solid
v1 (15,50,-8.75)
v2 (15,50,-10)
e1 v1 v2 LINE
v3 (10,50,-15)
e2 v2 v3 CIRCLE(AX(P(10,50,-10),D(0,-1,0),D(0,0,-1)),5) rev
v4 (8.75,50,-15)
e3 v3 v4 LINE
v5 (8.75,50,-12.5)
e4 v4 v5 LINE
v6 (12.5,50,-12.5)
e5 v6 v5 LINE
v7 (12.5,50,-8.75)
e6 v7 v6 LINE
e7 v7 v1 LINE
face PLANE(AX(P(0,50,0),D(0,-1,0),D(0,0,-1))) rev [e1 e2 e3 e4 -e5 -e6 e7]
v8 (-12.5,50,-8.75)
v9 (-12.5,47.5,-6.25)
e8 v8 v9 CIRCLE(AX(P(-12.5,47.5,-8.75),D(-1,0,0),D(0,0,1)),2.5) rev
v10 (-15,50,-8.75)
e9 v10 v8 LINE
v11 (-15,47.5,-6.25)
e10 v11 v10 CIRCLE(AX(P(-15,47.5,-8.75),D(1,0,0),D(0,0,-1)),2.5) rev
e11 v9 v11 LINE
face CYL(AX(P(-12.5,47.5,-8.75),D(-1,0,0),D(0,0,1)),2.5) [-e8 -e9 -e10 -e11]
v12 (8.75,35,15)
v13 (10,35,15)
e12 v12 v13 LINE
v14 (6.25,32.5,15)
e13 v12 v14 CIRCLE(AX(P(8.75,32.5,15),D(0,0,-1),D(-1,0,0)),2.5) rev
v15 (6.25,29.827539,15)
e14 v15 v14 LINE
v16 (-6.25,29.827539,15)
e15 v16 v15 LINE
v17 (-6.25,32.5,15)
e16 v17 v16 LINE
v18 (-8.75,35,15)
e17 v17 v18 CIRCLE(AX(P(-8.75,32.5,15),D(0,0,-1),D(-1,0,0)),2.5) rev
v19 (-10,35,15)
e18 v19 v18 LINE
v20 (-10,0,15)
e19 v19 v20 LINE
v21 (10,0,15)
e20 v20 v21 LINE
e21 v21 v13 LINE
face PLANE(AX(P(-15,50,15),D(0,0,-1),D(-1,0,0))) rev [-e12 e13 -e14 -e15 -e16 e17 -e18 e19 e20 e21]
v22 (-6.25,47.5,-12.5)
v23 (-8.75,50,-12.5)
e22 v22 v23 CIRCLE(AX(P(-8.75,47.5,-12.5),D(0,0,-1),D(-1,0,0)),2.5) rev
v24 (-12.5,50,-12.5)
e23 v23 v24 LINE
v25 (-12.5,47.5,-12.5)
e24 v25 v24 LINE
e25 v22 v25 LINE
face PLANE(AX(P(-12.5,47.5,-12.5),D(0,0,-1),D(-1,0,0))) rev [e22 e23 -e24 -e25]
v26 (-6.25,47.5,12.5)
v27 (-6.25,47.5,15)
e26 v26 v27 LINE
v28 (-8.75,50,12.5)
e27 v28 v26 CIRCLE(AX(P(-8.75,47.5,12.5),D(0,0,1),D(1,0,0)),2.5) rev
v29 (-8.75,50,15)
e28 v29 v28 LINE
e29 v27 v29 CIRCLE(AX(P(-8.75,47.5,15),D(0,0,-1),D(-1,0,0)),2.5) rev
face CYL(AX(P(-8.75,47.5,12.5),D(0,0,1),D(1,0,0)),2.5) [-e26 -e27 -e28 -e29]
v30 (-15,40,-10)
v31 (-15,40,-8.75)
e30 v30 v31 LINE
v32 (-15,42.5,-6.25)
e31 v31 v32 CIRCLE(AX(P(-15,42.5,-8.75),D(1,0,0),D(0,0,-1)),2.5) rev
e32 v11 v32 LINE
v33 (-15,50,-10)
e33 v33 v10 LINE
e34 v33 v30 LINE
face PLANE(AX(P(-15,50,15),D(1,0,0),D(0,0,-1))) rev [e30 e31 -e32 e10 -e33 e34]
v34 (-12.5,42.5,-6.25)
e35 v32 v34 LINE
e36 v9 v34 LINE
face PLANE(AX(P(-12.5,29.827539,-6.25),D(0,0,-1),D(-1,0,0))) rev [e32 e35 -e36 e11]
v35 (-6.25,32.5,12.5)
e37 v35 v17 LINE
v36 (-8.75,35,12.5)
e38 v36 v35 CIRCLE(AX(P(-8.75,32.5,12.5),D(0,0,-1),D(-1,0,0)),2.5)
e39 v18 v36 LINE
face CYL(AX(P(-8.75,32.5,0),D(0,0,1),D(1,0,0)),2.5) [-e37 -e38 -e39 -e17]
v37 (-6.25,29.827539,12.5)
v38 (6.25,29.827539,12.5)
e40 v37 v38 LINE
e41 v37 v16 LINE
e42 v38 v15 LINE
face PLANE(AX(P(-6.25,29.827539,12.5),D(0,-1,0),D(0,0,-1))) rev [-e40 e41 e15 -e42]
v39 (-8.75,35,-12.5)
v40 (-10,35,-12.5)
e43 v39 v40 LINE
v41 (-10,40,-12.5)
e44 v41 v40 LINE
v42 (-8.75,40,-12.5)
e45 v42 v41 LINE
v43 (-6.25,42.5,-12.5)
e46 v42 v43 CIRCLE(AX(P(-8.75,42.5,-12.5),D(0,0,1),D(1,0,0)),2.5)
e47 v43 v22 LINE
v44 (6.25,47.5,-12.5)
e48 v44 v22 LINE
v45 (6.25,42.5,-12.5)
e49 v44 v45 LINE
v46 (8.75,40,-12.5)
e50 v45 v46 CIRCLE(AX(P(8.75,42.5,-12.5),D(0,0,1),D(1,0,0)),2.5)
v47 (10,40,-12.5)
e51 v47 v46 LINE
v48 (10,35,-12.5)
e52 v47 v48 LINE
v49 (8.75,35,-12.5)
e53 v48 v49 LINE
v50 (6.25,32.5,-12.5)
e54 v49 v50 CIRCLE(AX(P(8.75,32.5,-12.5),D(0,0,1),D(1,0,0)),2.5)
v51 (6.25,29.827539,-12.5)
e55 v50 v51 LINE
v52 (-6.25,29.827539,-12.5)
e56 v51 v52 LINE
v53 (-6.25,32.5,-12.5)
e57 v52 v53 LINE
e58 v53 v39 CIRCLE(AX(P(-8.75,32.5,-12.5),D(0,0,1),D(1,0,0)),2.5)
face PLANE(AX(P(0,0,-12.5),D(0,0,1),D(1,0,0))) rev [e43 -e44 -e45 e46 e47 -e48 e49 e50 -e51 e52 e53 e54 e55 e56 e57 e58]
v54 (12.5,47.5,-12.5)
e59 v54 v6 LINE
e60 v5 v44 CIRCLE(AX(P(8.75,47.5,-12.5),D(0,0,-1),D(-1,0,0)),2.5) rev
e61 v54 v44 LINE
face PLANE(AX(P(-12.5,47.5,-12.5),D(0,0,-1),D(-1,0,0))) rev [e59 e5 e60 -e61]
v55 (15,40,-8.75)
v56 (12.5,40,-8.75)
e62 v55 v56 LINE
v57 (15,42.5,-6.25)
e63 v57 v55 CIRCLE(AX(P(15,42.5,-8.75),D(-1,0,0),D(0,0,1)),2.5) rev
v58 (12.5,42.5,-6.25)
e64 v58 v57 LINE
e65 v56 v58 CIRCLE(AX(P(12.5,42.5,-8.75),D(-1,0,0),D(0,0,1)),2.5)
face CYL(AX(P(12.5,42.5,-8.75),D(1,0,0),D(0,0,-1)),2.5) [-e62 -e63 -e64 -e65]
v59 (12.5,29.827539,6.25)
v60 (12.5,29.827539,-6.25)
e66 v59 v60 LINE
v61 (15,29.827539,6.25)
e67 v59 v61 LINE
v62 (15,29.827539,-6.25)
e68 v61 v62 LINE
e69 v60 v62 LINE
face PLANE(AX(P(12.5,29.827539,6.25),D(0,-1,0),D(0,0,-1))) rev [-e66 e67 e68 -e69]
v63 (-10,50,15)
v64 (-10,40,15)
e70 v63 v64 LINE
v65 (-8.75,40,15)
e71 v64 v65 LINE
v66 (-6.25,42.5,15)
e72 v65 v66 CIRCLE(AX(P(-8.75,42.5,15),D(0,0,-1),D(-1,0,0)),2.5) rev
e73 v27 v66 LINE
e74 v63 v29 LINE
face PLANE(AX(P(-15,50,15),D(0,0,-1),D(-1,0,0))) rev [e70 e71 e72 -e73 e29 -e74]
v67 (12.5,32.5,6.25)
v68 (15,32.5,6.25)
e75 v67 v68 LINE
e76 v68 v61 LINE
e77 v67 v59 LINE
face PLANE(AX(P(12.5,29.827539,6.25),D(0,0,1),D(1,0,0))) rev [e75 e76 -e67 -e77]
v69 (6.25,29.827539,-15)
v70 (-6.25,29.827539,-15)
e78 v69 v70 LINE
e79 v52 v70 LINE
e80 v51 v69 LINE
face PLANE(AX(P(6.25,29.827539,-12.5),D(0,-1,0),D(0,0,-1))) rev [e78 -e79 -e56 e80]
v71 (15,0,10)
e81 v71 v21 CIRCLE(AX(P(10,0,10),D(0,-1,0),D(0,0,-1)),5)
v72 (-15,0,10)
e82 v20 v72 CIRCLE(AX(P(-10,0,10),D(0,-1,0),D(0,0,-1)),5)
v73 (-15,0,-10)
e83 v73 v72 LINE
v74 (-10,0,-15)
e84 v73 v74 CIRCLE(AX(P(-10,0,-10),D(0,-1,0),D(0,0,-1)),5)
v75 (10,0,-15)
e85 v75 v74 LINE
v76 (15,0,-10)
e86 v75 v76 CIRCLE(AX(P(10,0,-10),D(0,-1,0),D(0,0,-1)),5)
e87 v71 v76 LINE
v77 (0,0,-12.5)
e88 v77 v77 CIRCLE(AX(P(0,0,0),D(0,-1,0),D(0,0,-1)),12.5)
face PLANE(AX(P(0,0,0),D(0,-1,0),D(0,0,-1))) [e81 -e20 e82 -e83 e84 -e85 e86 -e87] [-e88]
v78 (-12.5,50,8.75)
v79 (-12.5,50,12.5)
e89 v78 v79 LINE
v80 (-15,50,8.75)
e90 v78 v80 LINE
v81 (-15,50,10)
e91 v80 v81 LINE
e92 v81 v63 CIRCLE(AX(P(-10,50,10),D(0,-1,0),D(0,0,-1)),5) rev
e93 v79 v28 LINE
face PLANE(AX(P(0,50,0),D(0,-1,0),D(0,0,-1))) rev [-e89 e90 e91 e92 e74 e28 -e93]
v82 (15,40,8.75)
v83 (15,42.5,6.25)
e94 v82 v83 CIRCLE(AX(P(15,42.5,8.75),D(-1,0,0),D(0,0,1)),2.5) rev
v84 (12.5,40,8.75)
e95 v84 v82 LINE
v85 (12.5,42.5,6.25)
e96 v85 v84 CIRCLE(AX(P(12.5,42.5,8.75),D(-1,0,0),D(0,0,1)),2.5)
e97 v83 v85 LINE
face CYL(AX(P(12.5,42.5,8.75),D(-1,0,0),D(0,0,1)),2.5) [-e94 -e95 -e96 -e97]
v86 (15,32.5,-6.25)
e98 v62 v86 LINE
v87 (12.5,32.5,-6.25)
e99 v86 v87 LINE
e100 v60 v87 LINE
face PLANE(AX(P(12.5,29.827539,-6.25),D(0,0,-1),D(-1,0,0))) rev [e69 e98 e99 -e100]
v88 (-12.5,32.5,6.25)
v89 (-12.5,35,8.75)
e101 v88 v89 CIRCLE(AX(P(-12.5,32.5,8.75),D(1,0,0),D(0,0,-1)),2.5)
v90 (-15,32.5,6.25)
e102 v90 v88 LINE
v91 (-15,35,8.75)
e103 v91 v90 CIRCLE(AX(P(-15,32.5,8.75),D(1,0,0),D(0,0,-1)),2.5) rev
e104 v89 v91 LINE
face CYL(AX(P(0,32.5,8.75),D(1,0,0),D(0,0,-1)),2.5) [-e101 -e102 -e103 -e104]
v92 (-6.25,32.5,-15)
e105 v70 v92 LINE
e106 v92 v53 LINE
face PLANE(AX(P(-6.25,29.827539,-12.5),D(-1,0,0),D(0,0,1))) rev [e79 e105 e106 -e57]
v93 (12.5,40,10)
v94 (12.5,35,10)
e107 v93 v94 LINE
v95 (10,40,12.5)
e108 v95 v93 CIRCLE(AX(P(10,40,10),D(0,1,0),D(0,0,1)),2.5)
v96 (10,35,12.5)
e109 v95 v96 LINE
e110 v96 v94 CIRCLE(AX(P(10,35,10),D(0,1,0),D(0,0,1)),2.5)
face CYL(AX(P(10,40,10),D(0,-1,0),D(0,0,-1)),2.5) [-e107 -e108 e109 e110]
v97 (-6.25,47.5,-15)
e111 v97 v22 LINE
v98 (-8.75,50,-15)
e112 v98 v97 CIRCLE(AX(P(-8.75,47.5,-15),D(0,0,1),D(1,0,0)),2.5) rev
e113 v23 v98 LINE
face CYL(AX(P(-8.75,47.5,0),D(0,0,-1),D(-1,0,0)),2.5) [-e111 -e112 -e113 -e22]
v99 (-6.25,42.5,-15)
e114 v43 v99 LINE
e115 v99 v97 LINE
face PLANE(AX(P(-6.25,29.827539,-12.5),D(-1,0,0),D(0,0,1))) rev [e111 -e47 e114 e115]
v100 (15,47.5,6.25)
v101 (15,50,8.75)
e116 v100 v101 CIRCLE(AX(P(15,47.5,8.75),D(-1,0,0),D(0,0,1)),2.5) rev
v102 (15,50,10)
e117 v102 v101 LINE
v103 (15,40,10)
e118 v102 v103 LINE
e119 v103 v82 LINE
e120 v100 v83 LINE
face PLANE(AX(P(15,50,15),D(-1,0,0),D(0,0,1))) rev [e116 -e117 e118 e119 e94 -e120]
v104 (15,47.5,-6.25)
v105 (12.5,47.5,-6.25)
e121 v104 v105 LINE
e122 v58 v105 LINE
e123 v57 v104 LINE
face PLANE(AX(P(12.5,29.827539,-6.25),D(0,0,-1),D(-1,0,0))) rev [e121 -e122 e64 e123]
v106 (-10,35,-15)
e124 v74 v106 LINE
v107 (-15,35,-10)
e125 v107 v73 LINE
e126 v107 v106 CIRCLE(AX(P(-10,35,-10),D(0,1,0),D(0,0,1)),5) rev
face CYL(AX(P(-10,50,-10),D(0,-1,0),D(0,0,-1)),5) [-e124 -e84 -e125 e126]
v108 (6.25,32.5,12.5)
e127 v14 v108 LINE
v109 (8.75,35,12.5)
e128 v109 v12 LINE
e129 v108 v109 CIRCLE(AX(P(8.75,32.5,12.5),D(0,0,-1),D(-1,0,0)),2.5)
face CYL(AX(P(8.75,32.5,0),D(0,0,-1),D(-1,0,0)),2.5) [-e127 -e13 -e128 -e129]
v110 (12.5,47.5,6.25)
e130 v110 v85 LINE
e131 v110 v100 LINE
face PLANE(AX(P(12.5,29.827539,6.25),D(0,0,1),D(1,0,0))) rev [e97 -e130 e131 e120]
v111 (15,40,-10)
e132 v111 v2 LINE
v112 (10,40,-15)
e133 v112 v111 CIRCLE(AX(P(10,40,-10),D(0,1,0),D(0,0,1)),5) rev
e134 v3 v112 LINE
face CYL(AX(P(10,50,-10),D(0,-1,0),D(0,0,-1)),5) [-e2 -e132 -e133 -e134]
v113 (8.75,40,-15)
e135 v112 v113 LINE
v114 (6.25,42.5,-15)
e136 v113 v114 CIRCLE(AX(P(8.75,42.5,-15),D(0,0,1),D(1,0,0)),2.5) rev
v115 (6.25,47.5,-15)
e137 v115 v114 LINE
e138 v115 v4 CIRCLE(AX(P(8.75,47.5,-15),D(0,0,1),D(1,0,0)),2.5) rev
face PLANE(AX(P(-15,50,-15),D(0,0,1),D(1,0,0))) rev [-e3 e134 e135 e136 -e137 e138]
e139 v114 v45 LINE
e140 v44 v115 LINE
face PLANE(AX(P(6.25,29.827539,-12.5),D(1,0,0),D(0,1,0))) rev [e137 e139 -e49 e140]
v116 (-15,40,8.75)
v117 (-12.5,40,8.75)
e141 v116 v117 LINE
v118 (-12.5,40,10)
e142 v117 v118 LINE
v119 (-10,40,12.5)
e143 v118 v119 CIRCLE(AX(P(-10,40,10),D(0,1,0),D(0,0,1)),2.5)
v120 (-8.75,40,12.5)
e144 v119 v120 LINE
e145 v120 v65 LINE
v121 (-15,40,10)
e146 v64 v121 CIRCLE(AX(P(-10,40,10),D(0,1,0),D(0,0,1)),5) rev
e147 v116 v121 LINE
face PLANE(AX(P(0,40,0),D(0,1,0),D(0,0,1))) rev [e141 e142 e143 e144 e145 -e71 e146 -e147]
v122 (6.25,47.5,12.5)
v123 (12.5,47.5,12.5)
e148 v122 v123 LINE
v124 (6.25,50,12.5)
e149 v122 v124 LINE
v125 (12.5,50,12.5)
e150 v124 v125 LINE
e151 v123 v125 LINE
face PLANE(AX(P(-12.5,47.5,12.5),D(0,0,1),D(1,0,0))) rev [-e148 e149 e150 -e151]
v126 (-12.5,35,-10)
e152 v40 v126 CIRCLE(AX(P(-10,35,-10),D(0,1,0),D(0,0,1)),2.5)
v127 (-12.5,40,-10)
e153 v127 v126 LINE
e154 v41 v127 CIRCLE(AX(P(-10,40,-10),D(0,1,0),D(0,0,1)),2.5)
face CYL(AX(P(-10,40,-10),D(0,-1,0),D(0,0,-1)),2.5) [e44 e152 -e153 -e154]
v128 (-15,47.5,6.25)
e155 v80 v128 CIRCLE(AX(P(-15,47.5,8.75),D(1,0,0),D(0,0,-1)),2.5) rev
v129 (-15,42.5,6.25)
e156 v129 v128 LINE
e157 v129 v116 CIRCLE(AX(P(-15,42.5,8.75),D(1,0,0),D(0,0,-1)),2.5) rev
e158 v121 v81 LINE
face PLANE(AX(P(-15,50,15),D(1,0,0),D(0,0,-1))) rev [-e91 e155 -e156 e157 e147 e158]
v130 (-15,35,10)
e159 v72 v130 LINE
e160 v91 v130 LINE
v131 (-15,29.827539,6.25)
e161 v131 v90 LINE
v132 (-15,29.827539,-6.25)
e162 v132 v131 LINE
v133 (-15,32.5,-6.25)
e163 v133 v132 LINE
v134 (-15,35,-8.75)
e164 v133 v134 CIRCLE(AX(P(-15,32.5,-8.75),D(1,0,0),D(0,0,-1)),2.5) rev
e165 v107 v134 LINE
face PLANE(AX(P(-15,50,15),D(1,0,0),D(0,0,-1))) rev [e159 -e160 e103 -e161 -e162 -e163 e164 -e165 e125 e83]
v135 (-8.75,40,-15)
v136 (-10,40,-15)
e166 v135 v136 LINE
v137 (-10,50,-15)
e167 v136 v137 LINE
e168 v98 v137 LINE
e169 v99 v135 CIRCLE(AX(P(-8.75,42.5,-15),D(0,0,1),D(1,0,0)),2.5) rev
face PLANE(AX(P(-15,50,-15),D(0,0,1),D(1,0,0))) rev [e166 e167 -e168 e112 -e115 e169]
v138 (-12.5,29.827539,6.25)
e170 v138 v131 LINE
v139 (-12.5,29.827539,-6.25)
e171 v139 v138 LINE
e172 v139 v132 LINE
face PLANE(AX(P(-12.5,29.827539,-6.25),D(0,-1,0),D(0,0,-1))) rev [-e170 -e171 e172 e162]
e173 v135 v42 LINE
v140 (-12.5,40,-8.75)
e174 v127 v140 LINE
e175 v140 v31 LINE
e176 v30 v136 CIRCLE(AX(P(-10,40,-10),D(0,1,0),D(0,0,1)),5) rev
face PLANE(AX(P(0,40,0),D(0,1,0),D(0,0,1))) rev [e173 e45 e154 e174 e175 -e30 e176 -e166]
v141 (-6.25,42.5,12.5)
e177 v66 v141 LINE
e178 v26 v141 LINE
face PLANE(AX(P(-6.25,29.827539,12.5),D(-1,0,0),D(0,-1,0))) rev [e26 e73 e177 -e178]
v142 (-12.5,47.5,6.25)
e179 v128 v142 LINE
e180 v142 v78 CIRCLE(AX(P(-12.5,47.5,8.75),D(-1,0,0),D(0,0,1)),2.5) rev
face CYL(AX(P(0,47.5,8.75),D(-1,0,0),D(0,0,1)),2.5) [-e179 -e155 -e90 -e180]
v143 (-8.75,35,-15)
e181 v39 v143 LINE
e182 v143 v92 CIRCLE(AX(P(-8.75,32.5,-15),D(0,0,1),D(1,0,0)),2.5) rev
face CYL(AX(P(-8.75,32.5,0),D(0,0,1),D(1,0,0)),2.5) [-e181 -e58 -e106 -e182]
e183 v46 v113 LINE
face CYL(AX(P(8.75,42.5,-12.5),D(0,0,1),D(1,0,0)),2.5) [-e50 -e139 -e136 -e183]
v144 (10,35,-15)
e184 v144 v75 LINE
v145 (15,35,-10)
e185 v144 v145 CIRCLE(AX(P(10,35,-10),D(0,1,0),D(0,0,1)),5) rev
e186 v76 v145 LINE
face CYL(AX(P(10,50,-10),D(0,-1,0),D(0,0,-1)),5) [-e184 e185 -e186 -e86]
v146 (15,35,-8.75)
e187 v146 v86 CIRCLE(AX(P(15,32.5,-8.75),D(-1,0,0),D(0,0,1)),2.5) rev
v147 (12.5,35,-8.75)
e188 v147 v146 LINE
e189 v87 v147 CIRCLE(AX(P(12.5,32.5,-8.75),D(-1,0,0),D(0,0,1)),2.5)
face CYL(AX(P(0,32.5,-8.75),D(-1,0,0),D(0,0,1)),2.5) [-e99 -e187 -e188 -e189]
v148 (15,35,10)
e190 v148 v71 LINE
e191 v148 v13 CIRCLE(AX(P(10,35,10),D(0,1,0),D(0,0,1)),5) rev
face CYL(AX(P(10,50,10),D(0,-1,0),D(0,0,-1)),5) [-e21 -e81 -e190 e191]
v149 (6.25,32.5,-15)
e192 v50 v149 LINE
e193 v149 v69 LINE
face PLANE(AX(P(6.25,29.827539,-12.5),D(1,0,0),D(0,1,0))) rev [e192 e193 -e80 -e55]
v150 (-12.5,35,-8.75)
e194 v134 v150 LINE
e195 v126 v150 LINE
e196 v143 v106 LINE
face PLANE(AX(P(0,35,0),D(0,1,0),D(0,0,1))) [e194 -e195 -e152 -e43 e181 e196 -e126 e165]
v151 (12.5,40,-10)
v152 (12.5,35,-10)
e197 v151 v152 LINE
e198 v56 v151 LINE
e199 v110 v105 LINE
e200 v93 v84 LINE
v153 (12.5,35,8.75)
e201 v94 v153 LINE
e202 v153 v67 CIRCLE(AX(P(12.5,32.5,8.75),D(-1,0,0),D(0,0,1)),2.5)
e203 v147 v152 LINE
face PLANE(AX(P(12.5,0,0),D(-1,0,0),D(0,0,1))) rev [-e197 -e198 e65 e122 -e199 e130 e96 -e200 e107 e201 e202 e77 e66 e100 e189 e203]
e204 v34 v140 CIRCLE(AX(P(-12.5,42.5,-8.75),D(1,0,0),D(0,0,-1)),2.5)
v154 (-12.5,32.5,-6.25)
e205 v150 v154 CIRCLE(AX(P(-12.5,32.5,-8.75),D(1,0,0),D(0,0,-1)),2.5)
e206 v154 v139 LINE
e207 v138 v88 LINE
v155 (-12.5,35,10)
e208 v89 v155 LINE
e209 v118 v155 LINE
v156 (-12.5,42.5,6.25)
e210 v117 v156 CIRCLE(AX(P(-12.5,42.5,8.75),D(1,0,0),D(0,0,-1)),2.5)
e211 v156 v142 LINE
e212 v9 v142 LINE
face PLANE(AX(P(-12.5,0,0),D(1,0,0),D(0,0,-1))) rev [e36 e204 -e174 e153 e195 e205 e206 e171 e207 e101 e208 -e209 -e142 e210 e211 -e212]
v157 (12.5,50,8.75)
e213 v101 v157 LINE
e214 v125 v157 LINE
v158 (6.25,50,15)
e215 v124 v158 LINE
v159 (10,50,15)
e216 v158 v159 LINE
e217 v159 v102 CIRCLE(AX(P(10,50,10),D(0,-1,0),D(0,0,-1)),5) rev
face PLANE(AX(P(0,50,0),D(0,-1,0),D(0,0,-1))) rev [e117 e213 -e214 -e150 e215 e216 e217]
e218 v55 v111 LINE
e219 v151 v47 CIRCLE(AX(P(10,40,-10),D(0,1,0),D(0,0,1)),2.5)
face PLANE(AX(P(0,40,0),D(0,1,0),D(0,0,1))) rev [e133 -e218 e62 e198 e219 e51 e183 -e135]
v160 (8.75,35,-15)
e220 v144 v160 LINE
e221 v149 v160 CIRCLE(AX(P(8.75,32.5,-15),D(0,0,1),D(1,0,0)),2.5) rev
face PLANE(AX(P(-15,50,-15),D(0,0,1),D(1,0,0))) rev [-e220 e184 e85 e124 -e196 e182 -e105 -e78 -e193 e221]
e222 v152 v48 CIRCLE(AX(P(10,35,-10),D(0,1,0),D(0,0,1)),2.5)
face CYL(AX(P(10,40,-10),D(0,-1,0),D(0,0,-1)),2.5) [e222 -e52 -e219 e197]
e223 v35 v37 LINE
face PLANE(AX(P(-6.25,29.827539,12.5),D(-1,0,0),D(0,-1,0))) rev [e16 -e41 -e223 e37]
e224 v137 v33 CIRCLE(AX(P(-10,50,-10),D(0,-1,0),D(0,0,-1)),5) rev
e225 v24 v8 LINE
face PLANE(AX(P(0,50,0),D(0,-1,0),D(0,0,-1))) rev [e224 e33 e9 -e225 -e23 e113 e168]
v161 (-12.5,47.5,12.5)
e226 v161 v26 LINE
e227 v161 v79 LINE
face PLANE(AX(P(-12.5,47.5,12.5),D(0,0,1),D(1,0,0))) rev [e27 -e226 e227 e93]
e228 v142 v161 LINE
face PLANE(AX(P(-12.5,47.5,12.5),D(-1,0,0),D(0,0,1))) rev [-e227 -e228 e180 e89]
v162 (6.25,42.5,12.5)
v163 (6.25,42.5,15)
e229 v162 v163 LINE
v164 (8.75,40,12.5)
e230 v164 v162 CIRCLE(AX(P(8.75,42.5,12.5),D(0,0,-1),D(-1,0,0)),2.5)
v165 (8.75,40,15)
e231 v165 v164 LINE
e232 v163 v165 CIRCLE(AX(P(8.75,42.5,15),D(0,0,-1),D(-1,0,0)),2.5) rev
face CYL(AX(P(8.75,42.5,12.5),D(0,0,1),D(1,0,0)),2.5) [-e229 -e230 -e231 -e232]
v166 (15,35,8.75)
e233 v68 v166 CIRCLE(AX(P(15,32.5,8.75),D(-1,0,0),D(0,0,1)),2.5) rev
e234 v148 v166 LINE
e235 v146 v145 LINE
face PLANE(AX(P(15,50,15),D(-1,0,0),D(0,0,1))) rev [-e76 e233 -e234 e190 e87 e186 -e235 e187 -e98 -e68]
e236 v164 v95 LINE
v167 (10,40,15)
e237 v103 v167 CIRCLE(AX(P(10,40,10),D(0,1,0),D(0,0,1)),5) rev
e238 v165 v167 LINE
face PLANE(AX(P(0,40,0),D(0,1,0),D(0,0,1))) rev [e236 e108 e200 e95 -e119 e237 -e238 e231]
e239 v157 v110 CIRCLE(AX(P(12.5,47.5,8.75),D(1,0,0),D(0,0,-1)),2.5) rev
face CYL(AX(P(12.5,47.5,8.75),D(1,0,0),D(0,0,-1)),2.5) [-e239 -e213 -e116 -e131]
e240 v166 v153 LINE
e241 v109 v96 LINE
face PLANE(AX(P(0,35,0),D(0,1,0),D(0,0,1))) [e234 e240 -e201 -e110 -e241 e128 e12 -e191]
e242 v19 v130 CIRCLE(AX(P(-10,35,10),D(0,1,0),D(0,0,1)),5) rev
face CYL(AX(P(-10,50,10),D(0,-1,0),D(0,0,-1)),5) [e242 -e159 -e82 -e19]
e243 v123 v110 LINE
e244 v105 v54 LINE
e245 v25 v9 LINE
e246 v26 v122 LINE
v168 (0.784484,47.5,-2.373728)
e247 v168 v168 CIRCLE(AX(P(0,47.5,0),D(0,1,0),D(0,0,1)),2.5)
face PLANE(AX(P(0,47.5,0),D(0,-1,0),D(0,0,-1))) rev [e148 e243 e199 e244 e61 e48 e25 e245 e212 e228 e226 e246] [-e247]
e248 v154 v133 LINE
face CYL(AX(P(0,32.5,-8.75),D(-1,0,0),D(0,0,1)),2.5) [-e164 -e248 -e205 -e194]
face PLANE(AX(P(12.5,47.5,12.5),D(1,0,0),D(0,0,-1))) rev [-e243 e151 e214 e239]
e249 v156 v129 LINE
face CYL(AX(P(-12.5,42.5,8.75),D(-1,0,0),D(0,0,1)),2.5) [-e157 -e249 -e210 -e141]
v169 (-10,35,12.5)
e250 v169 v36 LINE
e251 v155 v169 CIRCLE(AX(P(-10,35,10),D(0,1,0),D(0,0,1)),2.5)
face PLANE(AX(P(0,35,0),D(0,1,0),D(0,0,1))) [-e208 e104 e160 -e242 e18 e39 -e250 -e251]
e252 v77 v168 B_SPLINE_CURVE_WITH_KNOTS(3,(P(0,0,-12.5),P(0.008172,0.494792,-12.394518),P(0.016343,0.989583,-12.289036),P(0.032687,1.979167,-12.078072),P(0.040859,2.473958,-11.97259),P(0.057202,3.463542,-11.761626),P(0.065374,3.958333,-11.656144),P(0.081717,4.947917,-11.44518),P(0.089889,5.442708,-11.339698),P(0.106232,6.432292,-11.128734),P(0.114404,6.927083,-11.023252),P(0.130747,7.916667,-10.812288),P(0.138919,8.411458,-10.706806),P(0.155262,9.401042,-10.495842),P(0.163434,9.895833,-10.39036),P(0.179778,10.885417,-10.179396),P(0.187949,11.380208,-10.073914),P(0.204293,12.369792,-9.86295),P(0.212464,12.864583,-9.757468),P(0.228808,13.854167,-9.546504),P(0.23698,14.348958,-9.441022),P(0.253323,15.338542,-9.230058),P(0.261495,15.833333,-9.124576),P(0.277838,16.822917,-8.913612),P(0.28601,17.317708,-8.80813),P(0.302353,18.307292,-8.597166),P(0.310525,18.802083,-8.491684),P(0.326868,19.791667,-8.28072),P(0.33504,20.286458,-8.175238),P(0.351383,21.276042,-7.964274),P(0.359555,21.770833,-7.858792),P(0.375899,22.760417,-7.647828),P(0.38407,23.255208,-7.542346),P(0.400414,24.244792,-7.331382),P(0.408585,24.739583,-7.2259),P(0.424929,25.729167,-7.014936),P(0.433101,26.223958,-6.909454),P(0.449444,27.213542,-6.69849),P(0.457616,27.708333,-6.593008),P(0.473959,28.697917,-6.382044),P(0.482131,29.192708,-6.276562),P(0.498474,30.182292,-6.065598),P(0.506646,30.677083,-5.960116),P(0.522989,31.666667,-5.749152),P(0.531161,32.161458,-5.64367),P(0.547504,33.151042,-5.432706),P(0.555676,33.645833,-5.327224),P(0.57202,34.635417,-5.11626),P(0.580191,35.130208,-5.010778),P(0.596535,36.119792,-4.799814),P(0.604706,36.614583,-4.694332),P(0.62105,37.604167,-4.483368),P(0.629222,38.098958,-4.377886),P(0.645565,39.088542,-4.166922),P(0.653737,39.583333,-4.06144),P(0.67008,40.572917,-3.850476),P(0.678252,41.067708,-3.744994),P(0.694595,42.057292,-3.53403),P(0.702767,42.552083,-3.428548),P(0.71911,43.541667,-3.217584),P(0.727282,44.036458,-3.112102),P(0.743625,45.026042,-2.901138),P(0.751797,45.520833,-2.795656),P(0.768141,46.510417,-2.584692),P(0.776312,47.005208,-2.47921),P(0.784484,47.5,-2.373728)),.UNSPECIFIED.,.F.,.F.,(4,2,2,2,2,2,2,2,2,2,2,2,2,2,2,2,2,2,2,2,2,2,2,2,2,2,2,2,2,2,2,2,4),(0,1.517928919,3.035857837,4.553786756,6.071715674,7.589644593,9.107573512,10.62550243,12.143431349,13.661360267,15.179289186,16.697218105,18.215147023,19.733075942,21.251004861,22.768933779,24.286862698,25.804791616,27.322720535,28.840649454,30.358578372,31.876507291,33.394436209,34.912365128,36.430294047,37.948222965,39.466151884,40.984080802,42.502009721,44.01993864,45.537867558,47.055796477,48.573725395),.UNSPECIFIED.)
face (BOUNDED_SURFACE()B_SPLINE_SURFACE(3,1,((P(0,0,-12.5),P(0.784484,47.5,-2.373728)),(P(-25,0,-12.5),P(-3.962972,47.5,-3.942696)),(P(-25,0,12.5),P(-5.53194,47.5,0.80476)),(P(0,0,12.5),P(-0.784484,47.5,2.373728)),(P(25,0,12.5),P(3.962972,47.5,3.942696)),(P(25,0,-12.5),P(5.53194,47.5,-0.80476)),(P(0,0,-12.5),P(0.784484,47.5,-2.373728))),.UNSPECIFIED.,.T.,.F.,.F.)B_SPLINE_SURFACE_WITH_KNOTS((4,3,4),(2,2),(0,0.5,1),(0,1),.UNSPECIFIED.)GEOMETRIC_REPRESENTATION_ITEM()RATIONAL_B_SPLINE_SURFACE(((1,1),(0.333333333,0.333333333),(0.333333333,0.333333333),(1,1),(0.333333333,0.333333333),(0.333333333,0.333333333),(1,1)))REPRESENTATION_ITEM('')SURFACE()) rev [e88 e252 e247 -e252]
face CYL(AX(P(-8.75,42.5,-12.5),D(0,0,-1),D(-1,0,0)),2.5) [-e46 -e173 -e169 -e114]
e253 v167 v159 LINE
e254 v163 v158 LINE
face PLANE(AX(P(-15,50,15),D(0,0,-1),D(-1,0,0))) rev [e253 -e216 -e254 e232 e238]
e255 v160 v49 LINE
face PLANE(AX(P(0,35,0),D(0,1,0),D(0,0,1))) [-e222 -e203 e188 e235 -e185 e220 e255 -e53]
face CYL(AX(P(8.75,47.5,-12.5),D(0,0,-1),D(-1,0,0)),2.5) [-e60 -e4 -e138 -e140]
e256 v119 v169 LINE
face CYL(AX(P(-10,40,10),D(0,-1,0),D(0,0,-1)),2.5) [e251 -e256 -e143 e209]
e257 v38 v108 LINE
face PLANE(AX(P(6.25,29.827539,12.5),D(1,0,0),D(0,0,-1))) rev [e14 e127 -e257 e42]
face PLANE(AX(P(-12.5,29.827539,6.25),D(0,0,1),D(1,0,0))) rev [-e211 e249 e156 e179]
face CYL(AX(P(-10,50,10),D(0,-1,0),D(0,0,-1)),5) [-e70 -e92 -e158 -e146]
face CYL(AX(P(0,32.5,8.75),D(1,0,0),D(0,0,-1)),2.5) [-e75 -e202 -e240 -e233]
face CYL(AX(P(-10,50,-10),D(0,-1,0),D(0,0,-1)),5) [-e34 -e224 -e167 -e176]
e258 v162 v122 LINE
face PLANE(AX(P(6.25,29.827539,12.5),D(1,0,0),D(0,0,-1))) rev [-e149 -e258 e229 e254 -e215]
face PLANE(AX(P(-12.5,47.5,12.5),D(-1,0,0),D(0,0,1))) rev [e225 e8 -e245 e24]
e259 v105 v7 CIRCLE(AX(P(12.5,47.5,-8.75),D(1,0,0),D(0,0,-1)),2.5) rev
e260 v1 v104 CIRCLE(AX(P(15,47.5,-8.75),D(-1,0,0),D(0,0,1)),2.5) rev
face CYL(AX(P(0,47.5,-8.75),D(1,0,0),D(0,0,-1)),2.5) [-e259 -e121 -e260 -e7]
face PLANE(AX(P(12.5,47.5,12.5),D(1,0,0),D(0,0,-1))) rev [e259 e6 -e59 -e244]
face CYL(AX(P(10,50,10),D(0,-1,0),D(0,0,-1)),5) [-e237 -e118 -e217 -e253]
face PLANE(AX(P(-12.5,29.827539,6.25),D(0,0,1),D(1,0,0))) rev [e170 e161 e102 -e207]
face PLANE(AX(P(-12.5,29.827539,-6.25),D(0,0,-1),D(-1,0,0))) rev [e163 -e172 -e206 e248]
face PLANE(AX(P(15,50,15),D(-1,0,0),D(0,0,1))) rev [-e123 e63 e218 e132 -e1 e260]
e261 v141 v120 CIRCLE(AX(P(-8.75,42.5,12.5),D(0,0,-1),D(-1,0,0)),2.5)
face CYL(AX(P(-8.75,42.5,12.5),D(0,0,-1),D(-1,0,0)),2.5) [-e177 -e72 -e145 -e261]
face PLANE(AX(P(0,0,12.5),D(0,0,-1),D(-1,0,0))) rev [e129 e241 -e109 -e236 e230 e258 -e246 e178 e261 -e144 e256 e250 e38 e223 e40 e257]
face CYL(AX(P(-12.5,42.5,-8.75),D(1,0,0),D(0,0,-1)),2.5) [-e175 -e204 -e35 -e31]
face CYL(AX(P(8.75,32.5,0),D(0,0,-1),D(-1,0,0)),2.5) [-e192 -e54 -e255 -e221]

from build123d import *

# Parameters (mm, degrees)
SKETCH2_W           = 30
SKETCH2_H           = 30
BOSS_EXTRUDE1_DEPTH = 50
SKETCH3_W           = 25
SKETCH3_H           = 25
CUT_EXTRUDE1_DEPTH  = 2.5
FILLET1_R           = 5
SKETCH9_W           = 12.5
SKETCH9_H           = 20.172460503
CUT_EXTRUDE2_DEPTH  = 2.5
CIRPATTERN1_COUNT   = 4
SKETCH10_R          = 21.055389581
CUT_EXTRUDE4_DEPTH  = 5
FILLET2_R           = 2.5


with BuildPart() as part:
    # Sketch2 → Boss-Extrude1 (new body)
    with BuildSketch(Plane(origin=(0, 0, 0), x_dir=(1, 0, 0), z_dir=(0, 1, 0))):
        Rectangle(SKETCH2_W, SKETCH2_H)
    extrude(amount=BOSS_EXTRUDE1_DEPTH)

    # Sketch3 → Cut-Extrude1 (cut)
    with BuildSketch(Plane(origin=(0, 50, 0), x_dir=(1, 0, 0), z_dir=(0, 1, 0))):
        Rectangle(SKETCH3_W, SKETCH3_H)
    extrude(amount=-CUT_EXTRUDE1_DEPTH, mode=Mode.SUBTRACT)

    # Fillet1
    fillet1_edges = [part.edges().sort_by_distance(p)[0] for p in [
        (15, 25, 15),
        (-15, 25, 15),
        (-15, 25, -15),
        (15, 25, -15),
    ]]
    fillet(fillet1_edges, radius=FILLET1_R)

    # Cut-Loft2: read off the stored shape, not the designer's step
    # Cut-Loft2: loft between two sections, ruled curve by curve
    cut_loft2_from = [
        Edge.make_bspline([(0, 0, -12.5), (-25, 0, -12.5), (-25, 0, 12.5), (0, 0, 12.5), (25, 0, 12.5), (25, 0, -12.5), (0, 0, -12.5)], [0, 0, 0, 0, 0.5, 0.5, 0.5, 1, 1, 1, 1], 3, [1, 0.333333333, 0.333333333, 1, 0.333333333, 0.333333333, 1]),
    ]
    cut_loft2_to = [
        Edge.make_bspline([(0.784484005, 47.5, -2.373728048), (-3.962972092, 47.5, -3.942696057), (-5.531940101, 47.5, 0.804760039), (-0.784484005, 47.5, 2.373728048), (3.962972092, 47.5, 3.942696057), (5.531940101, 47.5, -0.804760039), (0.784484005, 47.5, -2.373728048)], [0, 0, 0, 0, 0.5, 0.5, 0.5, 1, 1, 1, 1], 3, [1, 0.333333333, 0.333333333, 1, 0.333333333, 0.333333333, 1]),
    ]
    cut_loft2 = Solid(Shell([*[Face.make_surface_from_curves(cut_loft2_from[k], cut_loft2_to[k]) for k in range(1)], Face(Wire(cut_loft2_from)), Face(Wire(cut_loft2_to))]))
    add(cut_loft2, mode=Mode.SUBTRACT)

    # Sketch9 → Cut-Extrude2 (cut)
    with BuildSketch(Plane.XY.offset(15)):
        with Locations((0, 39.913769749)):
            Rectangle(SKETCH9_W, SKETCH9_H)
    cut_extrude2 = extrude(amount=-CUT_EXTRUDE2_DEPTH, mode=Mode.SUBTRACT)

    # CirPattern1: Cut-Loft2, Cut-Extrude2 ×4 about axis
    cirpattern1_axis = Axis((0, 0, 0), (0, 1, 0))
    add([cut_loft2.rotate(cirpattern1_axis, i * 360 / CIRPATTERN1_COUNT) for i in range(1, CIRPATTERN1_COUNT)], mode=Mode.SUBTRACT)
    add([cut_extrude2.rotate(cirpattern1_axis, i * 360 / CIRPATTERN1_COUNT) for i in range(1, CIRPATTERN1_COUNT)], mode=Mode.SUBTRACT)

    # Sketch10 → Cut-Extrude4 (cut)
    with BuildSketch(Plane(origin=(0, 35, 0), x_dir=(1, 0, 0), z_dir=(0, 1, 0))):
        Circle(SKETCH10_R)
        with BuildLine():
            ThreePointArc((12.5, 10), (11.767766953, 11.767766953), (10, 12.5))
            Line((10, 12.5), (6.25, 12.5))
            Line((6.25, 12.5), (-6.25, 12.5))
            Line((-6.25, 12.5), (-10, 12.5))
            ThreePointArc((-10, 12.5), (-11.767766953, 11.767766953), (-12.5, 10))
            Line((-12.5, 10), (-12.5, 6.25))
            Line((-12.5, 6.25), (-12.5, -6.25))
            Line((-12.5, -6.25), (-12.5, -10))
            ThreePointArc((-12.5, -10), (-11.767766953, -11.767766953), (-10, -12.5))
            Line((-10, -12.5), (-6.25, -12.5))
            Line((-6.25, -12.5), (6.25, -12.5))
            Line((6.25, -12.5), (10, -12.5))
            ThreePointArc((10, -12.5), (11.767766953, -11.767766953), (12.5, -10))
            Line((12.5, -10), (12.5, -6.25))
            Line((12.5, -6.25), (12.5, 6.25))
            Line((12.5, 6.25), (12.5, 10))
        make_face(mode=Mode.SUBTRACT)
    extrude(amount=CUT_EXTRUDE4_DEPTH, mode=Mode.SUBTRACT)

    # Fillet2
    fillet2_edges = [part.edges().sort_by_distance(p)[0] for p in [
        (13.75, 50, -6.25),
        (13.75, 50, 6.25),
        (-6.25, 50, -13.75),
        (6.25, 50, -13.75),
        (-13.75, 50, 6.25),
        (-13.75, 50, -6.25),
        (13.75, 35, 6.25),
        (13.75, 40, 6.25),
        (-6.25, 40, 13.75),
        (-13.75, 40, 6.25),
        (-6.25, 40, -13.75),
        (-13.75, 40, -6.25),
        (6.25, 40, -13.75),
        (13.75, 40, -6.25),
        (6.25, 40, 13.75),
        (-6.25, 35, 13.75),
        (6.25, 35, 13.75),
        (13.75, 35, -6.25),
        (6.25, 35, -13.75),
        (-6.25, 35, -13.75),
        (-13.75, 35, -6.25),
        (-13.75, 35, 6.25),
        (-6.25, 50, 13.75),
    ]]
    fillet(fillet2_edges, radius=FILLET2_R)


solid = part.part
